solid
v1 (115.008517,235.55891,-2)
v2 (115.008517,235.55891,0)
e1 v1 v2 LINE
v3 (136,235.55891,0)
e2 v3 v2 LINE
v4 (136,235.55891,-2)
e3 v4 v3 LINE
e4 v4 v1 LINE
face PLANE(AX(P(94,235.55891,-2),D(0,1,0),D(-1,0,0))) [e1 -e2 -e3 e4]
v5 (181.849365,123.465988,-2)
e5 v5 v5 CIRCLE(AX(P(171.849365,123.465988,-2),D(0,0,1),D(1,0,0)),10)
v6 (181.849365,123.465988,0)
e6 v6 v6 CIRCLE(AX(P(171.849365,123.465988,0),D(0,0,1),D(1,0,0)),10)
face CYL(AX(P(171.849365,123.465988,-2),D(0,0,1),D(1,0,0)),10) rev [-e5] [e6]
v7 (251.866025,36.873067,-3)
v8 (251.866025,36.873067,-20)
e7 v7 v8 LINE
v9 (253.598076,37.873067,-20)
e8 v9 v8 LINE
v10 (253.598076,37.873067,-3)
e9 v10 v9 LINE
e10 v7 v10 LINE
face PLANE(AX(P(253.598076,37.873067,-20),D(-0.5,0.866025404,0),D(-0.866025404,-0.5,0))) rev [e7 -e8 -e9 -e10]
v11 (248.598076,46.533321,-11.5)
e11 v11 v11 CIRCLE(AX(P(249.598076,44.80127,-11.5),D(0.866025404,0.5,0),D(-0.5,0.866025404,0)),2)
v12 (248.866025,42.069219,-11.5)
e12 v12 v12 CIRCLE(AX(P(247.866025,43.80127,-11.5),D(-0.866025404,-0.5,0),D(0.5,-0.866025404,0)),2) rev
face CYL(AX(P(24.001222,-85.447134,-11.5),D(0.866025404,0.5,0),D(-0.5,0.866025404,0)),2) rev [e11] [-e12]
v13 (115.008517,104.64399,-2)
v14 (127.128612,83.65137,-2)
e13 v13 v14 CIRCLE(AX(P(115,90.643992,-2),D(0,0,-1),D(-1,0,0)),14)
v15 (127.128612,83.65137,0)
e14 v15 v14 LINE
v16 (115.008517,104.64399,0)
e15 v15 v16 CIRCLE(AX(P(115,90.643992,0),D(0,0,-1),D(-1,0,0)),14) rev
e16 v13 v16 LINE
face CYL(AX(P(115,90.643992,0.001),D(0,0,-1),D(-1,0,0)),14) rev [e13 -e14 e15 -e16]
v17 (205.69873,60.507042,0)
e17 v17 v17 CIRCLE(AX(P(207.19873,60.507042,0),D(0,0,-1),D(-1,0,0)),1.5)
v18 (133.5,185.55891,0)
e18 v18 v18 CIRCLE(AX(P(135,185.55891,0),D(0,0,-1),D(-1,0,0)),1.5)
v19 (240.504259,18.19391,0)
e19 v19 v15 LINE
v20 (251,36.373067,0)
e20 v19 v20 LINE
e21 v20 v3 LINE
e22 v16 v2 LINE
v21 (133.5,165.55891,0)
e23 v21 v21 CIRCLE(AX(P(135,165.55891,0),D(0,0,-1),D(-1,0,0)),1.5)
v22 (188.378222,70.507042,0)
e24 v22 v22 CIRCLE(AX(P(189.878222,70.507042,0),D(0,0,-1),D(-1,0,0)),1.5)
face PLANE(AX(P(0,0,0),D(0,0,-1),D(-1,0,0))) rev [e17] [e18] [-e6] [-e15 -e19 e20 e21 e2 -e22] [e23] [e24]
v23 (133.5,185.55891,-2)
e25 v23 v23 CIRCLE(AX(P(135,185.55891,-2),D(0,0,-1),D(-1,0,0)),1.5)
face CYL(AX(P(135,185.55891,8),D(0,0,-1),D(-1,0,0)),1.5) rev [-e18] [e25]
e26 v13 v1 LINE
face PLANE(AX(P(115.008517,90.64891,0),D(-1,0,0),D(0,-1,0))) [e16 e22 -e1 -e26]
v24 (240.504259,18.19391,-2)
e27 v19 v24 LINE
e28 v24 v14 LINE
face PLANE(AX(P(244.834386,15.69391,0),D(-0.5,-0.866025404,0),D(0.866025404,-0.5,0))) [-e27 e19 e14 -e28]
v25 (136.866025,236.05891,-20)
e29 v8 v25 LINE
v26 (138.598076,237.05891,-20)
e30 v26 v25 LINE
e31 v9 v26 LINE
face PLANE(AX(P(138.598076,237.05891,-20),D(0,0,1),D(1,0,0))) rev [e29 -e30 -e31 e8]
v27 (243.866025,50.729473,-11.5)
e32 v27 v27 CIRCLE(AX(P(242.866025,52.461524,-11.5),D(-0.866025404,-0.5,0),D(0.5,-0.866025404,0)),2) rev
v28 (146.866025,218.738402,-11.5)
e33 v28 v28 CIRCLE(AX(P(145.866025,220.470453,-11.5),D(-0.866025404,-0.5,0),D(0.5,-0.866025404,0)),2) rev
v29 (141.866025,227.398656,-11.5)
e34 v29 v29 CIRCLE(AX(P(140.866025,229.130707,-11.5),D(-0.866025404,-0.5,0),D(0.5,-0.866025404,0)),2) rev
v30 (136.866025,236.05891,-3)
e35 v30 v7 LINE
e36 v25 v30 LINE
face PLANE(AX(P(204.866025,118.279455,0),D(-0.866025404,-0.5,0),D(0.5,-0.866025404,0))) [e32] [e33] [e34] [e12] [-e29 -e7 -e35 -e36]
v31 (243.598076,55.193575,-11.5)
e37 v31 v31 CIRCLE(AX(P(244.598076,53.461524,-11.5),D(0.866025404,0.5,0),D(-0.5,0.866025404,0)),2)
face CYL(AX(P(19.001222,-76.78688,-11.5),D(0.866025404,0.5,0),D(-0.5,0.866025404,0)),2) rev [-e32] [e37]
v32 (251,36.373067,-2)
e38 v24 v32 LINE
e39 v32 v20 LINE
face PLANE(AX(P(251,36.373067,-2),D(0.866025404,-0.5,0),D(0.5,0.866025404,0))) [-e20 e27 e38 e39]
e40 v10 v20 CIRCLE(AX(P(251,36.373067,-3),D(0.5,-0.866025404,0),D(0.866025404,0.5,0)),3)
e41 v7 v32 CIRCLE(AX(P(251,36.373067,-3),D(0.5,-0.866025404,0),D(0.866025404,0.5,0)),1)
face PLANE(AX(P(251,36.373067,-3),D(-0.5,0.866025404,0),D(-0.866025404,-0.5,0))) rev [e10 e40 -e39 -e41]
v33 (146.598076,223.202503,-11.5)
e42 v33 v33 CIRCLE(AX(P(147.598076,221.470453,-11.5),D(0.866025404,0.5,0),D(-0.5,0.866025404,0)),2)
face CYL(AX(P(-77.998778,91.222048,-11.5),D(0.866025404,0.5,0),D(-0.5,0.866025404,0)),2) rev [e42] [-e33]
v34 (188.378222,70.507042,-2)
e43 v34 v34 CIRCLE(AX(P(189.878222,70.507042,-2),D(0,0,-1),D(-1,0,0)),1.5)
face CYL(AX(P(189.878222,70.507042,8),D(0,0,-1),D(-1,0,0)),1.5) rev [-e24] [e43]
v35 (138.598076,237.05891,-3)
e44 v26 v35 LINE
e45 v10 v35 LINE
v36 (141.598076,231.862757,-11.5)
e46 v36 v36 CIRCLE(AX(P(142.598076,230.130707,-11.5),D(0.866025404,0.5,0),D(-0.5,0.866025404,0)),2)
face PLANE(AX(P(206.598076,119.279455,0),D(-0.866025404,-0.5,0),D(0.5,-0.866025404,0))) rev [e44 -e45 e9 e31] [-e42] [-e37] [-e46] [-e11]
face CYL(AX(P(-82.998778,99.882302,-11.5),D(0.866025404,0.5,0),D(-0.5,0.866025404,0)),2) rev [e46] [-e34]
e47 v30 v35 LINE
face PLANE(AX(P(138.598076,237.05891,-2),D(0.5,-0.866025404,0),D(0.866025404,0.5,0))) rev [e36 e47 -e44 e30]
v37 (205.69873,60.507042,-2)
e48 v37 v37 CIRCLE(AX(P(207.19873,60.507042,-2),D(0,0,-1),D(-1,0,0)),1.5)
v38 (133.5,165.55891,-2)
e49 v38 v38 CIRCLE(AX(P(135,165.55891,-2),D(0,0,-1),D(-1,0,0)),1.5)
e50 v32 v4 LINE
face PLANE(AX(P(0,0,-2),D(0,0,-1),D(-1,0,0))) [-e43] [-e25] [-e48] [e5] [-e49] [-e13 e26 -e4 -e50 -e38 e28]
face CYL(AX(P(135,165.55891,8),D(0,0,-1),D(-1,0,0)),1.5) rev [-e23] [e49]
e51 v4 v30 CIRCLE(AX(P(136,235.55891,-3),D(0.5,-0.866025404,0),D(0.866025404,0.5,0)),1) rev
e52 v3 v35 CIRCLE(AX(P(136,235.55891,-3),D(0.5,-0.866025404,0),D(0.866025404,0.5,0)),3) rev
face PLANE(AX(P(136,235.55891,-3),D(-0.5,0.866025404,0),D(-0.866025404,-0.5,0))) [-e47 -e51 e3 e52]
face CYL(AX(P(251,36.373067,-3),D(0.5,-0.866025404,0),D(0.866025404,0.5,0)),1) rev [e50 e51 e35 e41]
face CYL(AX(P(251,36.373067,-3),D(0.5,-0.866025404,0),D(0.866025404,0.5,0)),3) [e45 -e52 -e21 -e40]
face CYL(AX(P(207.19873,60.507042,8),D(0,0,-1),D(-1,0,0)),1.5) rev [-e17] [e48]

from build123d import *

# Parameters (mm, degrees)
SKETCH_10_R                   = 10
SM_BASE_FLANGE_3_DEPTH        = 2
SM_EDGE_FLANGE_6_DEPTH        = 230
SM_EDGE_FLANGE_6_BEND_DEPTH   = 230
SM_EDGE_FLANGE_6_BEND_2_DEPTH = 230
CUT_EXTRUDE_4_REACH           = 363.137
SKETCH_47_R                   = 2
CUT_EXTRUDE_6_REACH           = 263.424
SKETCH_50_R                   = 2
CUT_EXTRUDE_7_REACH           = 351.772
SKETCH_51_R                   = 2
CUT_EXTRUDE_8_REACH           = 349.61
SKETCH_52_R                   = 14
SKETCH_53_R                   = 1.5
CUT_EXTRUDE_9_DEPTH           = 10
OTHER_START                   = -20
OTHER_2_OUTLINE_R             = 1.5
OTHER_2_DEPTH                 = 20


# Read off the part's stored shape, not the designer's step: Полость2
# Sheet-metal steps are written as plain solids
with BuildPart() as part:
    # Эскиз10 → Базовая кромка3 (new body)
    with BuildSketch(Plane.XY):
        Polygon((0, 0), (-21, 36.373066959), (94, 235.558909829), (136, 235.558909829), (251, 36.373066959), (230, 0), align=None)
        with Locations((171.849364905, 123.465988394)):
            Circle(SKETCH_10_R, mode=Mode.SUBTRACT)
    extrude(amount=-SM_BASE_FLANGE_3_DEPTH)

    # Ребро-кромка6 section (across the edge) → Ребро-кромка6 (add)
    with BuildSketch(Plane(origin=(-21.866025404, 36.873066959, -2), x_dir=(0.8660254037844436, -0.4999999999999914, -3.4914813388431334e-15), z_dir=(0.4999999999999914, 0.8660254037844436, 0))):
        with BuildLine():
            Line((-2, 1), (-2, 18))
            Line((-2, 18), (0, 18))
            Line((0, 18), (0, 1))
            ThreePointArc((0, 1), (0.292893219, 0.292893219), (1, 0))
            Line((1, 0), (1, -2))
            ThreePointArc((1, -2), (-1.121320344, -1.121320344), (-2, 1))
        make_face()
    extrude(amount=SM_EDGE_FLANGE_6_DEPTH)

    # Ребро-кромка6 section 2 (across the edge) → Ребро-кромка6 bend (add)
    with BuildSketch(Plane(origin=(136.866025404, 236.058909829, -2), x_dir=(-0.8660254037844363, -0.5000000000000041, -3.4914813388431334e-15), z_dir=(0.5000000000000041, -0.8660254037844363, 0))):
        with BuildLine():
            Line((-2, 1), (-2, 18))
            Line((-2, 18), (0, 18))
            Line((0, 18), (0, 1))
            ThreePointArc((0, 1), (0.292893219, 0.292893219), (1, 0))
            Line((1, 0), (1, -2))
            ThreePointArc((1, -2), (-1.121320344, -1.121320344), (-2, 1))
        make_face()
    extrude(amount=SM_EDGE_FLANGE_6_BEND_DEPTH)

    # Ребро-кромка6 section 3 (across the edge) → Ребро-кромка6 bend 2 (add)
    with BuildSketch(Plane(origin=(230, -1, -2), x_dir=(0, 1, 0), z_dir=(-1, 0, 0))):
        with BuildLine():
            Line((-2, 1), (-2, 18))
            Line((-2, 18), (0, 18))
            Line((0, 18), (0, 1))
            ThreePointArc((0, 1), (0.292893219, 0.292893219), (1, 0))
            Line((1, 0), (1, -2))
            ThreePointArc((1, -2), (-1.121320344, -1.121320344), (-2, 1))
        make_face()
    extrude(amount=SM_EDGE_FLANGE_6_BEND_2_DEPTH)

    # Эскиз47 → Вырез-Вытянуть4 (cut, up to next)
    with BuildSketch(Plane(origin=(-34.098076211, 19.686533479, 0), x_dir=(0, 0, 1), z_dir=(-0.866025403784443, 0.4999999999999925, 3.788649256556814e-15)), mode=Mode.PRIVATE) as cut_extrude_4_sk1:
        with Locations(Location((-11.5, 29, 0), (0, 0, 270))):
            Circle(SKETCH_47_R)
    cut_extrude_4_tool1 = extrude(cut_extrude_4_sk1.sketch, amount=-CUT_EXTRUDE_4_REACH, mode=Mode.PRIVATE) & part.part
    # Эскиз47 → Вырез-Вытянуть4 (cut, up to next)
    with BuildSketch(Plane(origin=(-34.098076211, 19.686533479, 0), x_dir=(0, 0, 1), z_dir=(-0.866025403784443, 0.4999999999999925, 3.788649256556814e-15)), mode=Mode.PRIVATE) as cut_extrude_4_sk2:
        with Locations(Location((-11.5, 39, 0), (0, 0, 270))):
            Circle(SKETCH_47_R)
    cut_extrude_4_tool2 = extrude(cut_extrude_4_sk2.sketch, amount=-CUT_EXTRUDE_4_REACH, mode=Mode.PRIVATE) & part.part
    # Эскиз47 → Вырез-Вытянуть4 (cut, up to next)
    with BuildSketch(Plane(origin=(-34.098076211, 19.686533479, 0), x_dir=(0, 0, 1), z_dir=(-0.866025403784443, 0.4999999999999925, 3.788649256556814e-15)), mode=Mode.PRIVATE) as cut_extrude_4_sk3:
        with Locations(Location((-11.5, 233, 0), (0, 0, 270))):
            Circle(SKETCH_47_R)
    cut_extrude_4_tool3 = extrude(cut_extrude_4_sk3.sketch, amount=-CUT_EXTRUDE_4_REACH, mode=Mode.PRIVATE) & part.part
    # Эскиз47 → Вырез-Вытянуть4 (cut, up to next)
    with BuildSketch(Plane(origin=(-34.098076211, 19.686533479, 0), x_dir=(0, 0, 1), z_dir=(-0.866025403784443, 0.4999999999999925, 3.788649256556814e-15)), mode=Mode.PRIVATE) as cut_extrude_4_sk4:
        with Locations(Location((-11.5, 243, 0), (0, 0, 270))):
            Circle(SKETCH_47_R)
    cut_extrude_4_tool4 = extrude(cut_extrude_4_sk4.sketch, amount=-CUT_EXTRUDE_4_REACH, mode=Mode.PRIVATE) & part.part
    add(cut_extrude_4_tool1.solids().sort_by_distance((-19.598076, 44.80127, -11.5))[0], mode=Mode.SUBTRACT)
    add(cut_extrude_4_tool2.solids().sort_by_distance((-14.598076, 53.461524, -11.5))[0], mode=Mode.SUBTRACT)
    add(cut_extrude_4_tool3.solids().sort_by_distance((82.401924, 221.470453, -11.5))[0], mode=Mode.SUBTRACT)
    add(cut_extrude_4_tool4.solids().sort_by_distance((87.401924, 230.130707, -11.5))[0], mode=Mode.SUBTRACT)

    # Эскиз50 → Вырез-Вытянуть6 (cut, up to next)
    with BuildSketch(Plane(origin=(206.598076211, 119.279454915, 0), x_dir=(0, 0, -1), z_dir=(0.866025403784436, 0.5000000000000047, 3.0623287353932815e-15)), mode=Mode.PRIVATE) as cut_extrude_6_sk1:
        with Locations(Location((11.5, -86, 0), (0, 0, 90))):
            Circle(SKETCH_50_R)
    cut_extrude_6_tool1 = extrude(cut_extrude_6_sk1.sketch, amount=-CUT_EXTRUDE_6_REACH, mode=Mode.PRIVATE) & part.part
    # Эскиз50 → Вырез-Вытянуть6 (cut, up to next)
    with BuildSketch(Plane(origin=(206.598076211, 119.279454915, 0), x_dir=(0, 0, -1), z_dir=(0.866025403784436, 0.5000000000000047, 3.0623287353932815e-15)), mode=Mode.PRIVATE) as cut_extrude_6_sk2:
        with Locations(Location((11.5, -76, 0), (0, 0, 90))):
            Circle(SKETCH_50_R)
    cut_extrude_6_tool2 = extrude(cut_extrude_6_sk2.sketch, amount=-CUT_EXTRUDE_6_REACH, mode=Mode.PRIVATE) & part.part
    # Эскиз50 → Вырез-Вытянуть6 (cut, up to next)
    with BuildSketch(Plane(origin=(206.598076211, 119.279454915, 0), x_dir=(0, 0, -1), z_dir=(0.866025403784436, 0.5000000000000047, 3.0623287353932815e-15)), mode=Mode.PRIVATE) as cut_extrude_6_sk3:
        with Locations(Location((11.5, 118, 0), (0, 0, 90))):
            Circle(SKETCH_50_R)
    cut_extrude_6_tool3 = extrude(cut_extrude_6_sk3.sketch, amount=-CUT_EXTRUDE_6_REACH, mode=Mode.PRIVATE) & part.part
    # Эскиз50 → Вырез-Вытянуть6 (cut, up to next)
    with BuildSketch(Plane(origin=(206.598076211, 119.279454915, 0), x_dir=(0, 0, -1), z_dir=(0.866025403784436, 0.5000000000000047, 3.0623287353932815e-15)), mode=Mode.PRIVATE) as cut_extrude_6_sk4:
        with Locations(Location((11.5, 128, 0), (0, 0, 90))):
            Circle(SKETCH_50_R)
    cut_extrude_6_tool4 = extrude(cut_extrude_6_sk4.sketch, amount=-CUT_EXTRUDE_6_REACH, mode=Mode.PRIVATE) & part.part
    add(cut_extrude_6_tool1.solids().sort_by_distance((249.598076, 44.80127, -11.5))[0], mode=Mode.SUBTRACT)
    add(cut_extrude_6_tool2.solids().sort_by_distance((244.598076, 53.461524, -11.5))[0], mode=Mode.SUBTRACT)
    add(cut_extrude_6_tool3.solids().sort_by_distance((147.598076, 221.470453, -11.5))[0], mode=Mode.SUBTRACT)
    add(cut_extrude_6_tool4.solids().sort_by_distance((142.598076, 230.130707, -11.5))[0], mode=Mode.SUBTRACT)

    # Эскиз51 → Вырез-Вытянуть7 (cut, up to next)
    with BuildSketch(Plane.XZ.offset(3), mode=Mode.PRIVATE) as cut_extrude_7_sk1:
        with Locations(Location((222, -11.5, 0), (0, 0, 270))):
            Circle(SKETCH_51_R)
    cut_extrude_7_tool1 = extrude(cut_extrude_7_sk1.sketch, amount=-CUT_EXTRUDE_7_REACH, mode=Mode.PRIVATE) & part.part
    # Эскиз51 → Вырез-Вытянуть7 (cut, up to next)
    with BuildSketch(Plane.XZ.offset(3), mode=Mode.PRIVATE) as cut_extrude_7_sk2:
        with Locations(Location((212, -11.5, 0), (0, 0, 270))):
            Circle(SKETCH_51_R)
    cut_extrude_7_tool2 = extrude(cut_extrude_7_sk2.sketch, amount=-CUT_EXTRUDE_7_REACH, mode=Mode.PRIVATE) & part.part
    # Эскиз51 → Вырез-Вытянуть7 (cut, up to next)
    with BuildSketch(Plane.XZ.offset(3), mode=Mode.PRIVATE) as cut_extrude_7_sk3:
        with Locations(Location((18, -11.5, 0), (0, 0, 270))):
            Circle(SKETCH_51_R)
    cut_extrude_7_tool3 = extrude(cut_extrude_7_sk3.sketch, amount=-CUT_EXTRUDE_7_REACH, mode=Mode.PRIVATE) & part.part
    # Эскиз51 → Вырез-Вытянуть7 (cut, up to next)
    with BuildSketch(Plane.XZ.offset(3), mode=Mode.PRIVATE) as cut_extrude_7_sk4:
        with Locations(Location((8, -11.5, 0), (0, 0, 270))):
            Circle(SKETCH_51_R)
    cut_extrude_7_tool4 = extrude(cut_extrude_7_sk4.sketch, amount=-CUT_EXTRUDE_7_REACH, mode=Mode.PRIVATE) & part.part
    add(cut_extrude_7_tool1.solids().sort_by_distance((222, -3, -11.5))[0], mode=Mode.SUBTRACT)
    add(cut_extrude_7_tool2.solids().sort_by_distance((212, -3, -11.5))[0], mode=Mode.SUBTRACT)
    add(cut_extrude_7_tool3.solids().sort_by_distance((18, -3, -11.5))[0], mode=Mode.SUBTRACT)
    add(cut_extrude_7_tool4.solids().sort_by_distance((8, -3, -11.5))[0], mode=Mode.SUBTRACT)

    # Эскиз52 → Вырез-Вытянуть8 (cut, up to next)
    with BuildSketch(Plane(origin=(0, 0, -2), x_dir=(-1, 0, 0), z_dir=(0, 0, -1)), mode=Mode.PRIVATE) as cut_extrude_8_sk1:
        with Locations((-115, 90.643992263)):
            Circle(SKETCH_52_R)
    cut_extrude_8_tool1 = extrude(cut_extrude_8_sk1.sketch, amount=-CUT_EXTRUDE_8_REACH, mode=Mode.PRIVATE) & part.part
    add(cut_extrude_8_tool1.solids().sort_by_distance((115, 90.643992, -2))[0], mode=Mode.SUBTRACT)

    # Эскиз53 → Вырез-Вытянуть9 (cut)
    with BuildSketch(Plane(origin=(0, 0, -2), x_dir=(-1, 0, 0), z_dir=(0, 0, -1))):
        with Locations((-40.121778265, 70.507041555)):
            Circle(SKETCH_53_R)
        with Locations((-22.801270189, 60.507041555)):
            Circle(SKETCH_53_R)
        with Locations((-60.121778265, 35.866025404)):
            Circle(SKETCH_53_R)
        with Locations((-42.801270189, 25.866025404)):
            Circle(SKETCH_53_R)
        with Locations((-95, 185.558909829)):
            Circle(SKETCH_53_R)
        with Locations((-95, 165.558909829)):
            Circle(SKETCH_53_R)
        with Locations((-135, 185.558909829)):
            Circle(SKETCH_53_R)
        with Locations((-135, 165.558909829)):
            Circle(SKETCH_53_R)
        with Locations((-207.198729811, 60.507041555)):
            Circle(SKETCH_53_R)
        with Locations((-189.878221735, 70.507041555)):
            Circle(SKETCH_53_R)
        with Locations((-187.198729811, 25.866025404)):
            Circle(SKETCH_53_R)
        with Locations((-169.878221735, 35.866025404)):
            Circle(SKETCH_53_R)
    extrude(amount=-CUT_EXTRUDE_9_DEPTH, mode=Mode.SUBTRACT)

    # Полость2 outline → Полость2 (cut)
    with BuildSketch(Plane.XY.offset(OTHER_START)):
        with BuildLine():
            Line((115.008517475, 104.643989672), (115.008517475, 235.558909829))
            Line((115.008517475, 235.558909829), (94, 235.558909829))
            Line((94, 235.558909829), (91.401923789, 237.058909829))
            Line((91.401923789, 237.058909829), (-23.598076211, 37.873066959))
            Line((-23.598076211, 37.873066959), (-21, 36.373066959))
            Line((-21, 36.373066959), (0, 0))
            Line((0, 0), (0, -3))
            Line((0, -3), (230, -3))
            Line((230, -3), (230, 0))
            Line((230, 0), (240.504258738, 18.193909829))
            Line((240.504258738, 18.193909829), (127.128612147, 83.651369908))
            ThreePointArc((127.128612147, 83.651369908), (102.875644347, 83.643992263), (115.008517475, 104.643989672))
        make_face()
        with Locations((42.801270189, 25.866025404)):
            Circle(OTHER_2_OUTLINE_R, mode=Mode.SUBTRACT)
        with Locations((60.121778265, 35.866025404)):
            Circle(OTHER_2_OUTLINE_R, mode=Mode.SUBTRACT)
        with Locations((22.801270189, 60.507041555)):
            Circle(OTHER_2_OUTLINE_R, mode=Mode.SUBTRACT)
        with Locations((40.121778265, 70.507041555)):
            Circle(OTHER_2_OUTLINE_R, mode=Mode.SUBTRACT)
        with Locations((169.878221735, 35.866025404)):
            Circle(OTHER_2_OUTLINE_R, mode=Mode.SUBTRACT)
        with Locations((187.198729811, 25.866025404)):
            Circle(OTHER_2_OUTLINE_R, mode=Mode.SUBTRACT)
        with Locations((95, 165.558909829)):
            Circle(OTHER_2_OUTLINE_R, mode=Mode.SUBTRACT)
        with Locations((95, 185.558909829)):
            Circle(OTHER_2_OUTLINE_R, mode=Mode.SUBTRACT)
    extrude(amount=OTHER_2_DEPTH, mode=Mode.SUBTRACT)


solid = part.part
